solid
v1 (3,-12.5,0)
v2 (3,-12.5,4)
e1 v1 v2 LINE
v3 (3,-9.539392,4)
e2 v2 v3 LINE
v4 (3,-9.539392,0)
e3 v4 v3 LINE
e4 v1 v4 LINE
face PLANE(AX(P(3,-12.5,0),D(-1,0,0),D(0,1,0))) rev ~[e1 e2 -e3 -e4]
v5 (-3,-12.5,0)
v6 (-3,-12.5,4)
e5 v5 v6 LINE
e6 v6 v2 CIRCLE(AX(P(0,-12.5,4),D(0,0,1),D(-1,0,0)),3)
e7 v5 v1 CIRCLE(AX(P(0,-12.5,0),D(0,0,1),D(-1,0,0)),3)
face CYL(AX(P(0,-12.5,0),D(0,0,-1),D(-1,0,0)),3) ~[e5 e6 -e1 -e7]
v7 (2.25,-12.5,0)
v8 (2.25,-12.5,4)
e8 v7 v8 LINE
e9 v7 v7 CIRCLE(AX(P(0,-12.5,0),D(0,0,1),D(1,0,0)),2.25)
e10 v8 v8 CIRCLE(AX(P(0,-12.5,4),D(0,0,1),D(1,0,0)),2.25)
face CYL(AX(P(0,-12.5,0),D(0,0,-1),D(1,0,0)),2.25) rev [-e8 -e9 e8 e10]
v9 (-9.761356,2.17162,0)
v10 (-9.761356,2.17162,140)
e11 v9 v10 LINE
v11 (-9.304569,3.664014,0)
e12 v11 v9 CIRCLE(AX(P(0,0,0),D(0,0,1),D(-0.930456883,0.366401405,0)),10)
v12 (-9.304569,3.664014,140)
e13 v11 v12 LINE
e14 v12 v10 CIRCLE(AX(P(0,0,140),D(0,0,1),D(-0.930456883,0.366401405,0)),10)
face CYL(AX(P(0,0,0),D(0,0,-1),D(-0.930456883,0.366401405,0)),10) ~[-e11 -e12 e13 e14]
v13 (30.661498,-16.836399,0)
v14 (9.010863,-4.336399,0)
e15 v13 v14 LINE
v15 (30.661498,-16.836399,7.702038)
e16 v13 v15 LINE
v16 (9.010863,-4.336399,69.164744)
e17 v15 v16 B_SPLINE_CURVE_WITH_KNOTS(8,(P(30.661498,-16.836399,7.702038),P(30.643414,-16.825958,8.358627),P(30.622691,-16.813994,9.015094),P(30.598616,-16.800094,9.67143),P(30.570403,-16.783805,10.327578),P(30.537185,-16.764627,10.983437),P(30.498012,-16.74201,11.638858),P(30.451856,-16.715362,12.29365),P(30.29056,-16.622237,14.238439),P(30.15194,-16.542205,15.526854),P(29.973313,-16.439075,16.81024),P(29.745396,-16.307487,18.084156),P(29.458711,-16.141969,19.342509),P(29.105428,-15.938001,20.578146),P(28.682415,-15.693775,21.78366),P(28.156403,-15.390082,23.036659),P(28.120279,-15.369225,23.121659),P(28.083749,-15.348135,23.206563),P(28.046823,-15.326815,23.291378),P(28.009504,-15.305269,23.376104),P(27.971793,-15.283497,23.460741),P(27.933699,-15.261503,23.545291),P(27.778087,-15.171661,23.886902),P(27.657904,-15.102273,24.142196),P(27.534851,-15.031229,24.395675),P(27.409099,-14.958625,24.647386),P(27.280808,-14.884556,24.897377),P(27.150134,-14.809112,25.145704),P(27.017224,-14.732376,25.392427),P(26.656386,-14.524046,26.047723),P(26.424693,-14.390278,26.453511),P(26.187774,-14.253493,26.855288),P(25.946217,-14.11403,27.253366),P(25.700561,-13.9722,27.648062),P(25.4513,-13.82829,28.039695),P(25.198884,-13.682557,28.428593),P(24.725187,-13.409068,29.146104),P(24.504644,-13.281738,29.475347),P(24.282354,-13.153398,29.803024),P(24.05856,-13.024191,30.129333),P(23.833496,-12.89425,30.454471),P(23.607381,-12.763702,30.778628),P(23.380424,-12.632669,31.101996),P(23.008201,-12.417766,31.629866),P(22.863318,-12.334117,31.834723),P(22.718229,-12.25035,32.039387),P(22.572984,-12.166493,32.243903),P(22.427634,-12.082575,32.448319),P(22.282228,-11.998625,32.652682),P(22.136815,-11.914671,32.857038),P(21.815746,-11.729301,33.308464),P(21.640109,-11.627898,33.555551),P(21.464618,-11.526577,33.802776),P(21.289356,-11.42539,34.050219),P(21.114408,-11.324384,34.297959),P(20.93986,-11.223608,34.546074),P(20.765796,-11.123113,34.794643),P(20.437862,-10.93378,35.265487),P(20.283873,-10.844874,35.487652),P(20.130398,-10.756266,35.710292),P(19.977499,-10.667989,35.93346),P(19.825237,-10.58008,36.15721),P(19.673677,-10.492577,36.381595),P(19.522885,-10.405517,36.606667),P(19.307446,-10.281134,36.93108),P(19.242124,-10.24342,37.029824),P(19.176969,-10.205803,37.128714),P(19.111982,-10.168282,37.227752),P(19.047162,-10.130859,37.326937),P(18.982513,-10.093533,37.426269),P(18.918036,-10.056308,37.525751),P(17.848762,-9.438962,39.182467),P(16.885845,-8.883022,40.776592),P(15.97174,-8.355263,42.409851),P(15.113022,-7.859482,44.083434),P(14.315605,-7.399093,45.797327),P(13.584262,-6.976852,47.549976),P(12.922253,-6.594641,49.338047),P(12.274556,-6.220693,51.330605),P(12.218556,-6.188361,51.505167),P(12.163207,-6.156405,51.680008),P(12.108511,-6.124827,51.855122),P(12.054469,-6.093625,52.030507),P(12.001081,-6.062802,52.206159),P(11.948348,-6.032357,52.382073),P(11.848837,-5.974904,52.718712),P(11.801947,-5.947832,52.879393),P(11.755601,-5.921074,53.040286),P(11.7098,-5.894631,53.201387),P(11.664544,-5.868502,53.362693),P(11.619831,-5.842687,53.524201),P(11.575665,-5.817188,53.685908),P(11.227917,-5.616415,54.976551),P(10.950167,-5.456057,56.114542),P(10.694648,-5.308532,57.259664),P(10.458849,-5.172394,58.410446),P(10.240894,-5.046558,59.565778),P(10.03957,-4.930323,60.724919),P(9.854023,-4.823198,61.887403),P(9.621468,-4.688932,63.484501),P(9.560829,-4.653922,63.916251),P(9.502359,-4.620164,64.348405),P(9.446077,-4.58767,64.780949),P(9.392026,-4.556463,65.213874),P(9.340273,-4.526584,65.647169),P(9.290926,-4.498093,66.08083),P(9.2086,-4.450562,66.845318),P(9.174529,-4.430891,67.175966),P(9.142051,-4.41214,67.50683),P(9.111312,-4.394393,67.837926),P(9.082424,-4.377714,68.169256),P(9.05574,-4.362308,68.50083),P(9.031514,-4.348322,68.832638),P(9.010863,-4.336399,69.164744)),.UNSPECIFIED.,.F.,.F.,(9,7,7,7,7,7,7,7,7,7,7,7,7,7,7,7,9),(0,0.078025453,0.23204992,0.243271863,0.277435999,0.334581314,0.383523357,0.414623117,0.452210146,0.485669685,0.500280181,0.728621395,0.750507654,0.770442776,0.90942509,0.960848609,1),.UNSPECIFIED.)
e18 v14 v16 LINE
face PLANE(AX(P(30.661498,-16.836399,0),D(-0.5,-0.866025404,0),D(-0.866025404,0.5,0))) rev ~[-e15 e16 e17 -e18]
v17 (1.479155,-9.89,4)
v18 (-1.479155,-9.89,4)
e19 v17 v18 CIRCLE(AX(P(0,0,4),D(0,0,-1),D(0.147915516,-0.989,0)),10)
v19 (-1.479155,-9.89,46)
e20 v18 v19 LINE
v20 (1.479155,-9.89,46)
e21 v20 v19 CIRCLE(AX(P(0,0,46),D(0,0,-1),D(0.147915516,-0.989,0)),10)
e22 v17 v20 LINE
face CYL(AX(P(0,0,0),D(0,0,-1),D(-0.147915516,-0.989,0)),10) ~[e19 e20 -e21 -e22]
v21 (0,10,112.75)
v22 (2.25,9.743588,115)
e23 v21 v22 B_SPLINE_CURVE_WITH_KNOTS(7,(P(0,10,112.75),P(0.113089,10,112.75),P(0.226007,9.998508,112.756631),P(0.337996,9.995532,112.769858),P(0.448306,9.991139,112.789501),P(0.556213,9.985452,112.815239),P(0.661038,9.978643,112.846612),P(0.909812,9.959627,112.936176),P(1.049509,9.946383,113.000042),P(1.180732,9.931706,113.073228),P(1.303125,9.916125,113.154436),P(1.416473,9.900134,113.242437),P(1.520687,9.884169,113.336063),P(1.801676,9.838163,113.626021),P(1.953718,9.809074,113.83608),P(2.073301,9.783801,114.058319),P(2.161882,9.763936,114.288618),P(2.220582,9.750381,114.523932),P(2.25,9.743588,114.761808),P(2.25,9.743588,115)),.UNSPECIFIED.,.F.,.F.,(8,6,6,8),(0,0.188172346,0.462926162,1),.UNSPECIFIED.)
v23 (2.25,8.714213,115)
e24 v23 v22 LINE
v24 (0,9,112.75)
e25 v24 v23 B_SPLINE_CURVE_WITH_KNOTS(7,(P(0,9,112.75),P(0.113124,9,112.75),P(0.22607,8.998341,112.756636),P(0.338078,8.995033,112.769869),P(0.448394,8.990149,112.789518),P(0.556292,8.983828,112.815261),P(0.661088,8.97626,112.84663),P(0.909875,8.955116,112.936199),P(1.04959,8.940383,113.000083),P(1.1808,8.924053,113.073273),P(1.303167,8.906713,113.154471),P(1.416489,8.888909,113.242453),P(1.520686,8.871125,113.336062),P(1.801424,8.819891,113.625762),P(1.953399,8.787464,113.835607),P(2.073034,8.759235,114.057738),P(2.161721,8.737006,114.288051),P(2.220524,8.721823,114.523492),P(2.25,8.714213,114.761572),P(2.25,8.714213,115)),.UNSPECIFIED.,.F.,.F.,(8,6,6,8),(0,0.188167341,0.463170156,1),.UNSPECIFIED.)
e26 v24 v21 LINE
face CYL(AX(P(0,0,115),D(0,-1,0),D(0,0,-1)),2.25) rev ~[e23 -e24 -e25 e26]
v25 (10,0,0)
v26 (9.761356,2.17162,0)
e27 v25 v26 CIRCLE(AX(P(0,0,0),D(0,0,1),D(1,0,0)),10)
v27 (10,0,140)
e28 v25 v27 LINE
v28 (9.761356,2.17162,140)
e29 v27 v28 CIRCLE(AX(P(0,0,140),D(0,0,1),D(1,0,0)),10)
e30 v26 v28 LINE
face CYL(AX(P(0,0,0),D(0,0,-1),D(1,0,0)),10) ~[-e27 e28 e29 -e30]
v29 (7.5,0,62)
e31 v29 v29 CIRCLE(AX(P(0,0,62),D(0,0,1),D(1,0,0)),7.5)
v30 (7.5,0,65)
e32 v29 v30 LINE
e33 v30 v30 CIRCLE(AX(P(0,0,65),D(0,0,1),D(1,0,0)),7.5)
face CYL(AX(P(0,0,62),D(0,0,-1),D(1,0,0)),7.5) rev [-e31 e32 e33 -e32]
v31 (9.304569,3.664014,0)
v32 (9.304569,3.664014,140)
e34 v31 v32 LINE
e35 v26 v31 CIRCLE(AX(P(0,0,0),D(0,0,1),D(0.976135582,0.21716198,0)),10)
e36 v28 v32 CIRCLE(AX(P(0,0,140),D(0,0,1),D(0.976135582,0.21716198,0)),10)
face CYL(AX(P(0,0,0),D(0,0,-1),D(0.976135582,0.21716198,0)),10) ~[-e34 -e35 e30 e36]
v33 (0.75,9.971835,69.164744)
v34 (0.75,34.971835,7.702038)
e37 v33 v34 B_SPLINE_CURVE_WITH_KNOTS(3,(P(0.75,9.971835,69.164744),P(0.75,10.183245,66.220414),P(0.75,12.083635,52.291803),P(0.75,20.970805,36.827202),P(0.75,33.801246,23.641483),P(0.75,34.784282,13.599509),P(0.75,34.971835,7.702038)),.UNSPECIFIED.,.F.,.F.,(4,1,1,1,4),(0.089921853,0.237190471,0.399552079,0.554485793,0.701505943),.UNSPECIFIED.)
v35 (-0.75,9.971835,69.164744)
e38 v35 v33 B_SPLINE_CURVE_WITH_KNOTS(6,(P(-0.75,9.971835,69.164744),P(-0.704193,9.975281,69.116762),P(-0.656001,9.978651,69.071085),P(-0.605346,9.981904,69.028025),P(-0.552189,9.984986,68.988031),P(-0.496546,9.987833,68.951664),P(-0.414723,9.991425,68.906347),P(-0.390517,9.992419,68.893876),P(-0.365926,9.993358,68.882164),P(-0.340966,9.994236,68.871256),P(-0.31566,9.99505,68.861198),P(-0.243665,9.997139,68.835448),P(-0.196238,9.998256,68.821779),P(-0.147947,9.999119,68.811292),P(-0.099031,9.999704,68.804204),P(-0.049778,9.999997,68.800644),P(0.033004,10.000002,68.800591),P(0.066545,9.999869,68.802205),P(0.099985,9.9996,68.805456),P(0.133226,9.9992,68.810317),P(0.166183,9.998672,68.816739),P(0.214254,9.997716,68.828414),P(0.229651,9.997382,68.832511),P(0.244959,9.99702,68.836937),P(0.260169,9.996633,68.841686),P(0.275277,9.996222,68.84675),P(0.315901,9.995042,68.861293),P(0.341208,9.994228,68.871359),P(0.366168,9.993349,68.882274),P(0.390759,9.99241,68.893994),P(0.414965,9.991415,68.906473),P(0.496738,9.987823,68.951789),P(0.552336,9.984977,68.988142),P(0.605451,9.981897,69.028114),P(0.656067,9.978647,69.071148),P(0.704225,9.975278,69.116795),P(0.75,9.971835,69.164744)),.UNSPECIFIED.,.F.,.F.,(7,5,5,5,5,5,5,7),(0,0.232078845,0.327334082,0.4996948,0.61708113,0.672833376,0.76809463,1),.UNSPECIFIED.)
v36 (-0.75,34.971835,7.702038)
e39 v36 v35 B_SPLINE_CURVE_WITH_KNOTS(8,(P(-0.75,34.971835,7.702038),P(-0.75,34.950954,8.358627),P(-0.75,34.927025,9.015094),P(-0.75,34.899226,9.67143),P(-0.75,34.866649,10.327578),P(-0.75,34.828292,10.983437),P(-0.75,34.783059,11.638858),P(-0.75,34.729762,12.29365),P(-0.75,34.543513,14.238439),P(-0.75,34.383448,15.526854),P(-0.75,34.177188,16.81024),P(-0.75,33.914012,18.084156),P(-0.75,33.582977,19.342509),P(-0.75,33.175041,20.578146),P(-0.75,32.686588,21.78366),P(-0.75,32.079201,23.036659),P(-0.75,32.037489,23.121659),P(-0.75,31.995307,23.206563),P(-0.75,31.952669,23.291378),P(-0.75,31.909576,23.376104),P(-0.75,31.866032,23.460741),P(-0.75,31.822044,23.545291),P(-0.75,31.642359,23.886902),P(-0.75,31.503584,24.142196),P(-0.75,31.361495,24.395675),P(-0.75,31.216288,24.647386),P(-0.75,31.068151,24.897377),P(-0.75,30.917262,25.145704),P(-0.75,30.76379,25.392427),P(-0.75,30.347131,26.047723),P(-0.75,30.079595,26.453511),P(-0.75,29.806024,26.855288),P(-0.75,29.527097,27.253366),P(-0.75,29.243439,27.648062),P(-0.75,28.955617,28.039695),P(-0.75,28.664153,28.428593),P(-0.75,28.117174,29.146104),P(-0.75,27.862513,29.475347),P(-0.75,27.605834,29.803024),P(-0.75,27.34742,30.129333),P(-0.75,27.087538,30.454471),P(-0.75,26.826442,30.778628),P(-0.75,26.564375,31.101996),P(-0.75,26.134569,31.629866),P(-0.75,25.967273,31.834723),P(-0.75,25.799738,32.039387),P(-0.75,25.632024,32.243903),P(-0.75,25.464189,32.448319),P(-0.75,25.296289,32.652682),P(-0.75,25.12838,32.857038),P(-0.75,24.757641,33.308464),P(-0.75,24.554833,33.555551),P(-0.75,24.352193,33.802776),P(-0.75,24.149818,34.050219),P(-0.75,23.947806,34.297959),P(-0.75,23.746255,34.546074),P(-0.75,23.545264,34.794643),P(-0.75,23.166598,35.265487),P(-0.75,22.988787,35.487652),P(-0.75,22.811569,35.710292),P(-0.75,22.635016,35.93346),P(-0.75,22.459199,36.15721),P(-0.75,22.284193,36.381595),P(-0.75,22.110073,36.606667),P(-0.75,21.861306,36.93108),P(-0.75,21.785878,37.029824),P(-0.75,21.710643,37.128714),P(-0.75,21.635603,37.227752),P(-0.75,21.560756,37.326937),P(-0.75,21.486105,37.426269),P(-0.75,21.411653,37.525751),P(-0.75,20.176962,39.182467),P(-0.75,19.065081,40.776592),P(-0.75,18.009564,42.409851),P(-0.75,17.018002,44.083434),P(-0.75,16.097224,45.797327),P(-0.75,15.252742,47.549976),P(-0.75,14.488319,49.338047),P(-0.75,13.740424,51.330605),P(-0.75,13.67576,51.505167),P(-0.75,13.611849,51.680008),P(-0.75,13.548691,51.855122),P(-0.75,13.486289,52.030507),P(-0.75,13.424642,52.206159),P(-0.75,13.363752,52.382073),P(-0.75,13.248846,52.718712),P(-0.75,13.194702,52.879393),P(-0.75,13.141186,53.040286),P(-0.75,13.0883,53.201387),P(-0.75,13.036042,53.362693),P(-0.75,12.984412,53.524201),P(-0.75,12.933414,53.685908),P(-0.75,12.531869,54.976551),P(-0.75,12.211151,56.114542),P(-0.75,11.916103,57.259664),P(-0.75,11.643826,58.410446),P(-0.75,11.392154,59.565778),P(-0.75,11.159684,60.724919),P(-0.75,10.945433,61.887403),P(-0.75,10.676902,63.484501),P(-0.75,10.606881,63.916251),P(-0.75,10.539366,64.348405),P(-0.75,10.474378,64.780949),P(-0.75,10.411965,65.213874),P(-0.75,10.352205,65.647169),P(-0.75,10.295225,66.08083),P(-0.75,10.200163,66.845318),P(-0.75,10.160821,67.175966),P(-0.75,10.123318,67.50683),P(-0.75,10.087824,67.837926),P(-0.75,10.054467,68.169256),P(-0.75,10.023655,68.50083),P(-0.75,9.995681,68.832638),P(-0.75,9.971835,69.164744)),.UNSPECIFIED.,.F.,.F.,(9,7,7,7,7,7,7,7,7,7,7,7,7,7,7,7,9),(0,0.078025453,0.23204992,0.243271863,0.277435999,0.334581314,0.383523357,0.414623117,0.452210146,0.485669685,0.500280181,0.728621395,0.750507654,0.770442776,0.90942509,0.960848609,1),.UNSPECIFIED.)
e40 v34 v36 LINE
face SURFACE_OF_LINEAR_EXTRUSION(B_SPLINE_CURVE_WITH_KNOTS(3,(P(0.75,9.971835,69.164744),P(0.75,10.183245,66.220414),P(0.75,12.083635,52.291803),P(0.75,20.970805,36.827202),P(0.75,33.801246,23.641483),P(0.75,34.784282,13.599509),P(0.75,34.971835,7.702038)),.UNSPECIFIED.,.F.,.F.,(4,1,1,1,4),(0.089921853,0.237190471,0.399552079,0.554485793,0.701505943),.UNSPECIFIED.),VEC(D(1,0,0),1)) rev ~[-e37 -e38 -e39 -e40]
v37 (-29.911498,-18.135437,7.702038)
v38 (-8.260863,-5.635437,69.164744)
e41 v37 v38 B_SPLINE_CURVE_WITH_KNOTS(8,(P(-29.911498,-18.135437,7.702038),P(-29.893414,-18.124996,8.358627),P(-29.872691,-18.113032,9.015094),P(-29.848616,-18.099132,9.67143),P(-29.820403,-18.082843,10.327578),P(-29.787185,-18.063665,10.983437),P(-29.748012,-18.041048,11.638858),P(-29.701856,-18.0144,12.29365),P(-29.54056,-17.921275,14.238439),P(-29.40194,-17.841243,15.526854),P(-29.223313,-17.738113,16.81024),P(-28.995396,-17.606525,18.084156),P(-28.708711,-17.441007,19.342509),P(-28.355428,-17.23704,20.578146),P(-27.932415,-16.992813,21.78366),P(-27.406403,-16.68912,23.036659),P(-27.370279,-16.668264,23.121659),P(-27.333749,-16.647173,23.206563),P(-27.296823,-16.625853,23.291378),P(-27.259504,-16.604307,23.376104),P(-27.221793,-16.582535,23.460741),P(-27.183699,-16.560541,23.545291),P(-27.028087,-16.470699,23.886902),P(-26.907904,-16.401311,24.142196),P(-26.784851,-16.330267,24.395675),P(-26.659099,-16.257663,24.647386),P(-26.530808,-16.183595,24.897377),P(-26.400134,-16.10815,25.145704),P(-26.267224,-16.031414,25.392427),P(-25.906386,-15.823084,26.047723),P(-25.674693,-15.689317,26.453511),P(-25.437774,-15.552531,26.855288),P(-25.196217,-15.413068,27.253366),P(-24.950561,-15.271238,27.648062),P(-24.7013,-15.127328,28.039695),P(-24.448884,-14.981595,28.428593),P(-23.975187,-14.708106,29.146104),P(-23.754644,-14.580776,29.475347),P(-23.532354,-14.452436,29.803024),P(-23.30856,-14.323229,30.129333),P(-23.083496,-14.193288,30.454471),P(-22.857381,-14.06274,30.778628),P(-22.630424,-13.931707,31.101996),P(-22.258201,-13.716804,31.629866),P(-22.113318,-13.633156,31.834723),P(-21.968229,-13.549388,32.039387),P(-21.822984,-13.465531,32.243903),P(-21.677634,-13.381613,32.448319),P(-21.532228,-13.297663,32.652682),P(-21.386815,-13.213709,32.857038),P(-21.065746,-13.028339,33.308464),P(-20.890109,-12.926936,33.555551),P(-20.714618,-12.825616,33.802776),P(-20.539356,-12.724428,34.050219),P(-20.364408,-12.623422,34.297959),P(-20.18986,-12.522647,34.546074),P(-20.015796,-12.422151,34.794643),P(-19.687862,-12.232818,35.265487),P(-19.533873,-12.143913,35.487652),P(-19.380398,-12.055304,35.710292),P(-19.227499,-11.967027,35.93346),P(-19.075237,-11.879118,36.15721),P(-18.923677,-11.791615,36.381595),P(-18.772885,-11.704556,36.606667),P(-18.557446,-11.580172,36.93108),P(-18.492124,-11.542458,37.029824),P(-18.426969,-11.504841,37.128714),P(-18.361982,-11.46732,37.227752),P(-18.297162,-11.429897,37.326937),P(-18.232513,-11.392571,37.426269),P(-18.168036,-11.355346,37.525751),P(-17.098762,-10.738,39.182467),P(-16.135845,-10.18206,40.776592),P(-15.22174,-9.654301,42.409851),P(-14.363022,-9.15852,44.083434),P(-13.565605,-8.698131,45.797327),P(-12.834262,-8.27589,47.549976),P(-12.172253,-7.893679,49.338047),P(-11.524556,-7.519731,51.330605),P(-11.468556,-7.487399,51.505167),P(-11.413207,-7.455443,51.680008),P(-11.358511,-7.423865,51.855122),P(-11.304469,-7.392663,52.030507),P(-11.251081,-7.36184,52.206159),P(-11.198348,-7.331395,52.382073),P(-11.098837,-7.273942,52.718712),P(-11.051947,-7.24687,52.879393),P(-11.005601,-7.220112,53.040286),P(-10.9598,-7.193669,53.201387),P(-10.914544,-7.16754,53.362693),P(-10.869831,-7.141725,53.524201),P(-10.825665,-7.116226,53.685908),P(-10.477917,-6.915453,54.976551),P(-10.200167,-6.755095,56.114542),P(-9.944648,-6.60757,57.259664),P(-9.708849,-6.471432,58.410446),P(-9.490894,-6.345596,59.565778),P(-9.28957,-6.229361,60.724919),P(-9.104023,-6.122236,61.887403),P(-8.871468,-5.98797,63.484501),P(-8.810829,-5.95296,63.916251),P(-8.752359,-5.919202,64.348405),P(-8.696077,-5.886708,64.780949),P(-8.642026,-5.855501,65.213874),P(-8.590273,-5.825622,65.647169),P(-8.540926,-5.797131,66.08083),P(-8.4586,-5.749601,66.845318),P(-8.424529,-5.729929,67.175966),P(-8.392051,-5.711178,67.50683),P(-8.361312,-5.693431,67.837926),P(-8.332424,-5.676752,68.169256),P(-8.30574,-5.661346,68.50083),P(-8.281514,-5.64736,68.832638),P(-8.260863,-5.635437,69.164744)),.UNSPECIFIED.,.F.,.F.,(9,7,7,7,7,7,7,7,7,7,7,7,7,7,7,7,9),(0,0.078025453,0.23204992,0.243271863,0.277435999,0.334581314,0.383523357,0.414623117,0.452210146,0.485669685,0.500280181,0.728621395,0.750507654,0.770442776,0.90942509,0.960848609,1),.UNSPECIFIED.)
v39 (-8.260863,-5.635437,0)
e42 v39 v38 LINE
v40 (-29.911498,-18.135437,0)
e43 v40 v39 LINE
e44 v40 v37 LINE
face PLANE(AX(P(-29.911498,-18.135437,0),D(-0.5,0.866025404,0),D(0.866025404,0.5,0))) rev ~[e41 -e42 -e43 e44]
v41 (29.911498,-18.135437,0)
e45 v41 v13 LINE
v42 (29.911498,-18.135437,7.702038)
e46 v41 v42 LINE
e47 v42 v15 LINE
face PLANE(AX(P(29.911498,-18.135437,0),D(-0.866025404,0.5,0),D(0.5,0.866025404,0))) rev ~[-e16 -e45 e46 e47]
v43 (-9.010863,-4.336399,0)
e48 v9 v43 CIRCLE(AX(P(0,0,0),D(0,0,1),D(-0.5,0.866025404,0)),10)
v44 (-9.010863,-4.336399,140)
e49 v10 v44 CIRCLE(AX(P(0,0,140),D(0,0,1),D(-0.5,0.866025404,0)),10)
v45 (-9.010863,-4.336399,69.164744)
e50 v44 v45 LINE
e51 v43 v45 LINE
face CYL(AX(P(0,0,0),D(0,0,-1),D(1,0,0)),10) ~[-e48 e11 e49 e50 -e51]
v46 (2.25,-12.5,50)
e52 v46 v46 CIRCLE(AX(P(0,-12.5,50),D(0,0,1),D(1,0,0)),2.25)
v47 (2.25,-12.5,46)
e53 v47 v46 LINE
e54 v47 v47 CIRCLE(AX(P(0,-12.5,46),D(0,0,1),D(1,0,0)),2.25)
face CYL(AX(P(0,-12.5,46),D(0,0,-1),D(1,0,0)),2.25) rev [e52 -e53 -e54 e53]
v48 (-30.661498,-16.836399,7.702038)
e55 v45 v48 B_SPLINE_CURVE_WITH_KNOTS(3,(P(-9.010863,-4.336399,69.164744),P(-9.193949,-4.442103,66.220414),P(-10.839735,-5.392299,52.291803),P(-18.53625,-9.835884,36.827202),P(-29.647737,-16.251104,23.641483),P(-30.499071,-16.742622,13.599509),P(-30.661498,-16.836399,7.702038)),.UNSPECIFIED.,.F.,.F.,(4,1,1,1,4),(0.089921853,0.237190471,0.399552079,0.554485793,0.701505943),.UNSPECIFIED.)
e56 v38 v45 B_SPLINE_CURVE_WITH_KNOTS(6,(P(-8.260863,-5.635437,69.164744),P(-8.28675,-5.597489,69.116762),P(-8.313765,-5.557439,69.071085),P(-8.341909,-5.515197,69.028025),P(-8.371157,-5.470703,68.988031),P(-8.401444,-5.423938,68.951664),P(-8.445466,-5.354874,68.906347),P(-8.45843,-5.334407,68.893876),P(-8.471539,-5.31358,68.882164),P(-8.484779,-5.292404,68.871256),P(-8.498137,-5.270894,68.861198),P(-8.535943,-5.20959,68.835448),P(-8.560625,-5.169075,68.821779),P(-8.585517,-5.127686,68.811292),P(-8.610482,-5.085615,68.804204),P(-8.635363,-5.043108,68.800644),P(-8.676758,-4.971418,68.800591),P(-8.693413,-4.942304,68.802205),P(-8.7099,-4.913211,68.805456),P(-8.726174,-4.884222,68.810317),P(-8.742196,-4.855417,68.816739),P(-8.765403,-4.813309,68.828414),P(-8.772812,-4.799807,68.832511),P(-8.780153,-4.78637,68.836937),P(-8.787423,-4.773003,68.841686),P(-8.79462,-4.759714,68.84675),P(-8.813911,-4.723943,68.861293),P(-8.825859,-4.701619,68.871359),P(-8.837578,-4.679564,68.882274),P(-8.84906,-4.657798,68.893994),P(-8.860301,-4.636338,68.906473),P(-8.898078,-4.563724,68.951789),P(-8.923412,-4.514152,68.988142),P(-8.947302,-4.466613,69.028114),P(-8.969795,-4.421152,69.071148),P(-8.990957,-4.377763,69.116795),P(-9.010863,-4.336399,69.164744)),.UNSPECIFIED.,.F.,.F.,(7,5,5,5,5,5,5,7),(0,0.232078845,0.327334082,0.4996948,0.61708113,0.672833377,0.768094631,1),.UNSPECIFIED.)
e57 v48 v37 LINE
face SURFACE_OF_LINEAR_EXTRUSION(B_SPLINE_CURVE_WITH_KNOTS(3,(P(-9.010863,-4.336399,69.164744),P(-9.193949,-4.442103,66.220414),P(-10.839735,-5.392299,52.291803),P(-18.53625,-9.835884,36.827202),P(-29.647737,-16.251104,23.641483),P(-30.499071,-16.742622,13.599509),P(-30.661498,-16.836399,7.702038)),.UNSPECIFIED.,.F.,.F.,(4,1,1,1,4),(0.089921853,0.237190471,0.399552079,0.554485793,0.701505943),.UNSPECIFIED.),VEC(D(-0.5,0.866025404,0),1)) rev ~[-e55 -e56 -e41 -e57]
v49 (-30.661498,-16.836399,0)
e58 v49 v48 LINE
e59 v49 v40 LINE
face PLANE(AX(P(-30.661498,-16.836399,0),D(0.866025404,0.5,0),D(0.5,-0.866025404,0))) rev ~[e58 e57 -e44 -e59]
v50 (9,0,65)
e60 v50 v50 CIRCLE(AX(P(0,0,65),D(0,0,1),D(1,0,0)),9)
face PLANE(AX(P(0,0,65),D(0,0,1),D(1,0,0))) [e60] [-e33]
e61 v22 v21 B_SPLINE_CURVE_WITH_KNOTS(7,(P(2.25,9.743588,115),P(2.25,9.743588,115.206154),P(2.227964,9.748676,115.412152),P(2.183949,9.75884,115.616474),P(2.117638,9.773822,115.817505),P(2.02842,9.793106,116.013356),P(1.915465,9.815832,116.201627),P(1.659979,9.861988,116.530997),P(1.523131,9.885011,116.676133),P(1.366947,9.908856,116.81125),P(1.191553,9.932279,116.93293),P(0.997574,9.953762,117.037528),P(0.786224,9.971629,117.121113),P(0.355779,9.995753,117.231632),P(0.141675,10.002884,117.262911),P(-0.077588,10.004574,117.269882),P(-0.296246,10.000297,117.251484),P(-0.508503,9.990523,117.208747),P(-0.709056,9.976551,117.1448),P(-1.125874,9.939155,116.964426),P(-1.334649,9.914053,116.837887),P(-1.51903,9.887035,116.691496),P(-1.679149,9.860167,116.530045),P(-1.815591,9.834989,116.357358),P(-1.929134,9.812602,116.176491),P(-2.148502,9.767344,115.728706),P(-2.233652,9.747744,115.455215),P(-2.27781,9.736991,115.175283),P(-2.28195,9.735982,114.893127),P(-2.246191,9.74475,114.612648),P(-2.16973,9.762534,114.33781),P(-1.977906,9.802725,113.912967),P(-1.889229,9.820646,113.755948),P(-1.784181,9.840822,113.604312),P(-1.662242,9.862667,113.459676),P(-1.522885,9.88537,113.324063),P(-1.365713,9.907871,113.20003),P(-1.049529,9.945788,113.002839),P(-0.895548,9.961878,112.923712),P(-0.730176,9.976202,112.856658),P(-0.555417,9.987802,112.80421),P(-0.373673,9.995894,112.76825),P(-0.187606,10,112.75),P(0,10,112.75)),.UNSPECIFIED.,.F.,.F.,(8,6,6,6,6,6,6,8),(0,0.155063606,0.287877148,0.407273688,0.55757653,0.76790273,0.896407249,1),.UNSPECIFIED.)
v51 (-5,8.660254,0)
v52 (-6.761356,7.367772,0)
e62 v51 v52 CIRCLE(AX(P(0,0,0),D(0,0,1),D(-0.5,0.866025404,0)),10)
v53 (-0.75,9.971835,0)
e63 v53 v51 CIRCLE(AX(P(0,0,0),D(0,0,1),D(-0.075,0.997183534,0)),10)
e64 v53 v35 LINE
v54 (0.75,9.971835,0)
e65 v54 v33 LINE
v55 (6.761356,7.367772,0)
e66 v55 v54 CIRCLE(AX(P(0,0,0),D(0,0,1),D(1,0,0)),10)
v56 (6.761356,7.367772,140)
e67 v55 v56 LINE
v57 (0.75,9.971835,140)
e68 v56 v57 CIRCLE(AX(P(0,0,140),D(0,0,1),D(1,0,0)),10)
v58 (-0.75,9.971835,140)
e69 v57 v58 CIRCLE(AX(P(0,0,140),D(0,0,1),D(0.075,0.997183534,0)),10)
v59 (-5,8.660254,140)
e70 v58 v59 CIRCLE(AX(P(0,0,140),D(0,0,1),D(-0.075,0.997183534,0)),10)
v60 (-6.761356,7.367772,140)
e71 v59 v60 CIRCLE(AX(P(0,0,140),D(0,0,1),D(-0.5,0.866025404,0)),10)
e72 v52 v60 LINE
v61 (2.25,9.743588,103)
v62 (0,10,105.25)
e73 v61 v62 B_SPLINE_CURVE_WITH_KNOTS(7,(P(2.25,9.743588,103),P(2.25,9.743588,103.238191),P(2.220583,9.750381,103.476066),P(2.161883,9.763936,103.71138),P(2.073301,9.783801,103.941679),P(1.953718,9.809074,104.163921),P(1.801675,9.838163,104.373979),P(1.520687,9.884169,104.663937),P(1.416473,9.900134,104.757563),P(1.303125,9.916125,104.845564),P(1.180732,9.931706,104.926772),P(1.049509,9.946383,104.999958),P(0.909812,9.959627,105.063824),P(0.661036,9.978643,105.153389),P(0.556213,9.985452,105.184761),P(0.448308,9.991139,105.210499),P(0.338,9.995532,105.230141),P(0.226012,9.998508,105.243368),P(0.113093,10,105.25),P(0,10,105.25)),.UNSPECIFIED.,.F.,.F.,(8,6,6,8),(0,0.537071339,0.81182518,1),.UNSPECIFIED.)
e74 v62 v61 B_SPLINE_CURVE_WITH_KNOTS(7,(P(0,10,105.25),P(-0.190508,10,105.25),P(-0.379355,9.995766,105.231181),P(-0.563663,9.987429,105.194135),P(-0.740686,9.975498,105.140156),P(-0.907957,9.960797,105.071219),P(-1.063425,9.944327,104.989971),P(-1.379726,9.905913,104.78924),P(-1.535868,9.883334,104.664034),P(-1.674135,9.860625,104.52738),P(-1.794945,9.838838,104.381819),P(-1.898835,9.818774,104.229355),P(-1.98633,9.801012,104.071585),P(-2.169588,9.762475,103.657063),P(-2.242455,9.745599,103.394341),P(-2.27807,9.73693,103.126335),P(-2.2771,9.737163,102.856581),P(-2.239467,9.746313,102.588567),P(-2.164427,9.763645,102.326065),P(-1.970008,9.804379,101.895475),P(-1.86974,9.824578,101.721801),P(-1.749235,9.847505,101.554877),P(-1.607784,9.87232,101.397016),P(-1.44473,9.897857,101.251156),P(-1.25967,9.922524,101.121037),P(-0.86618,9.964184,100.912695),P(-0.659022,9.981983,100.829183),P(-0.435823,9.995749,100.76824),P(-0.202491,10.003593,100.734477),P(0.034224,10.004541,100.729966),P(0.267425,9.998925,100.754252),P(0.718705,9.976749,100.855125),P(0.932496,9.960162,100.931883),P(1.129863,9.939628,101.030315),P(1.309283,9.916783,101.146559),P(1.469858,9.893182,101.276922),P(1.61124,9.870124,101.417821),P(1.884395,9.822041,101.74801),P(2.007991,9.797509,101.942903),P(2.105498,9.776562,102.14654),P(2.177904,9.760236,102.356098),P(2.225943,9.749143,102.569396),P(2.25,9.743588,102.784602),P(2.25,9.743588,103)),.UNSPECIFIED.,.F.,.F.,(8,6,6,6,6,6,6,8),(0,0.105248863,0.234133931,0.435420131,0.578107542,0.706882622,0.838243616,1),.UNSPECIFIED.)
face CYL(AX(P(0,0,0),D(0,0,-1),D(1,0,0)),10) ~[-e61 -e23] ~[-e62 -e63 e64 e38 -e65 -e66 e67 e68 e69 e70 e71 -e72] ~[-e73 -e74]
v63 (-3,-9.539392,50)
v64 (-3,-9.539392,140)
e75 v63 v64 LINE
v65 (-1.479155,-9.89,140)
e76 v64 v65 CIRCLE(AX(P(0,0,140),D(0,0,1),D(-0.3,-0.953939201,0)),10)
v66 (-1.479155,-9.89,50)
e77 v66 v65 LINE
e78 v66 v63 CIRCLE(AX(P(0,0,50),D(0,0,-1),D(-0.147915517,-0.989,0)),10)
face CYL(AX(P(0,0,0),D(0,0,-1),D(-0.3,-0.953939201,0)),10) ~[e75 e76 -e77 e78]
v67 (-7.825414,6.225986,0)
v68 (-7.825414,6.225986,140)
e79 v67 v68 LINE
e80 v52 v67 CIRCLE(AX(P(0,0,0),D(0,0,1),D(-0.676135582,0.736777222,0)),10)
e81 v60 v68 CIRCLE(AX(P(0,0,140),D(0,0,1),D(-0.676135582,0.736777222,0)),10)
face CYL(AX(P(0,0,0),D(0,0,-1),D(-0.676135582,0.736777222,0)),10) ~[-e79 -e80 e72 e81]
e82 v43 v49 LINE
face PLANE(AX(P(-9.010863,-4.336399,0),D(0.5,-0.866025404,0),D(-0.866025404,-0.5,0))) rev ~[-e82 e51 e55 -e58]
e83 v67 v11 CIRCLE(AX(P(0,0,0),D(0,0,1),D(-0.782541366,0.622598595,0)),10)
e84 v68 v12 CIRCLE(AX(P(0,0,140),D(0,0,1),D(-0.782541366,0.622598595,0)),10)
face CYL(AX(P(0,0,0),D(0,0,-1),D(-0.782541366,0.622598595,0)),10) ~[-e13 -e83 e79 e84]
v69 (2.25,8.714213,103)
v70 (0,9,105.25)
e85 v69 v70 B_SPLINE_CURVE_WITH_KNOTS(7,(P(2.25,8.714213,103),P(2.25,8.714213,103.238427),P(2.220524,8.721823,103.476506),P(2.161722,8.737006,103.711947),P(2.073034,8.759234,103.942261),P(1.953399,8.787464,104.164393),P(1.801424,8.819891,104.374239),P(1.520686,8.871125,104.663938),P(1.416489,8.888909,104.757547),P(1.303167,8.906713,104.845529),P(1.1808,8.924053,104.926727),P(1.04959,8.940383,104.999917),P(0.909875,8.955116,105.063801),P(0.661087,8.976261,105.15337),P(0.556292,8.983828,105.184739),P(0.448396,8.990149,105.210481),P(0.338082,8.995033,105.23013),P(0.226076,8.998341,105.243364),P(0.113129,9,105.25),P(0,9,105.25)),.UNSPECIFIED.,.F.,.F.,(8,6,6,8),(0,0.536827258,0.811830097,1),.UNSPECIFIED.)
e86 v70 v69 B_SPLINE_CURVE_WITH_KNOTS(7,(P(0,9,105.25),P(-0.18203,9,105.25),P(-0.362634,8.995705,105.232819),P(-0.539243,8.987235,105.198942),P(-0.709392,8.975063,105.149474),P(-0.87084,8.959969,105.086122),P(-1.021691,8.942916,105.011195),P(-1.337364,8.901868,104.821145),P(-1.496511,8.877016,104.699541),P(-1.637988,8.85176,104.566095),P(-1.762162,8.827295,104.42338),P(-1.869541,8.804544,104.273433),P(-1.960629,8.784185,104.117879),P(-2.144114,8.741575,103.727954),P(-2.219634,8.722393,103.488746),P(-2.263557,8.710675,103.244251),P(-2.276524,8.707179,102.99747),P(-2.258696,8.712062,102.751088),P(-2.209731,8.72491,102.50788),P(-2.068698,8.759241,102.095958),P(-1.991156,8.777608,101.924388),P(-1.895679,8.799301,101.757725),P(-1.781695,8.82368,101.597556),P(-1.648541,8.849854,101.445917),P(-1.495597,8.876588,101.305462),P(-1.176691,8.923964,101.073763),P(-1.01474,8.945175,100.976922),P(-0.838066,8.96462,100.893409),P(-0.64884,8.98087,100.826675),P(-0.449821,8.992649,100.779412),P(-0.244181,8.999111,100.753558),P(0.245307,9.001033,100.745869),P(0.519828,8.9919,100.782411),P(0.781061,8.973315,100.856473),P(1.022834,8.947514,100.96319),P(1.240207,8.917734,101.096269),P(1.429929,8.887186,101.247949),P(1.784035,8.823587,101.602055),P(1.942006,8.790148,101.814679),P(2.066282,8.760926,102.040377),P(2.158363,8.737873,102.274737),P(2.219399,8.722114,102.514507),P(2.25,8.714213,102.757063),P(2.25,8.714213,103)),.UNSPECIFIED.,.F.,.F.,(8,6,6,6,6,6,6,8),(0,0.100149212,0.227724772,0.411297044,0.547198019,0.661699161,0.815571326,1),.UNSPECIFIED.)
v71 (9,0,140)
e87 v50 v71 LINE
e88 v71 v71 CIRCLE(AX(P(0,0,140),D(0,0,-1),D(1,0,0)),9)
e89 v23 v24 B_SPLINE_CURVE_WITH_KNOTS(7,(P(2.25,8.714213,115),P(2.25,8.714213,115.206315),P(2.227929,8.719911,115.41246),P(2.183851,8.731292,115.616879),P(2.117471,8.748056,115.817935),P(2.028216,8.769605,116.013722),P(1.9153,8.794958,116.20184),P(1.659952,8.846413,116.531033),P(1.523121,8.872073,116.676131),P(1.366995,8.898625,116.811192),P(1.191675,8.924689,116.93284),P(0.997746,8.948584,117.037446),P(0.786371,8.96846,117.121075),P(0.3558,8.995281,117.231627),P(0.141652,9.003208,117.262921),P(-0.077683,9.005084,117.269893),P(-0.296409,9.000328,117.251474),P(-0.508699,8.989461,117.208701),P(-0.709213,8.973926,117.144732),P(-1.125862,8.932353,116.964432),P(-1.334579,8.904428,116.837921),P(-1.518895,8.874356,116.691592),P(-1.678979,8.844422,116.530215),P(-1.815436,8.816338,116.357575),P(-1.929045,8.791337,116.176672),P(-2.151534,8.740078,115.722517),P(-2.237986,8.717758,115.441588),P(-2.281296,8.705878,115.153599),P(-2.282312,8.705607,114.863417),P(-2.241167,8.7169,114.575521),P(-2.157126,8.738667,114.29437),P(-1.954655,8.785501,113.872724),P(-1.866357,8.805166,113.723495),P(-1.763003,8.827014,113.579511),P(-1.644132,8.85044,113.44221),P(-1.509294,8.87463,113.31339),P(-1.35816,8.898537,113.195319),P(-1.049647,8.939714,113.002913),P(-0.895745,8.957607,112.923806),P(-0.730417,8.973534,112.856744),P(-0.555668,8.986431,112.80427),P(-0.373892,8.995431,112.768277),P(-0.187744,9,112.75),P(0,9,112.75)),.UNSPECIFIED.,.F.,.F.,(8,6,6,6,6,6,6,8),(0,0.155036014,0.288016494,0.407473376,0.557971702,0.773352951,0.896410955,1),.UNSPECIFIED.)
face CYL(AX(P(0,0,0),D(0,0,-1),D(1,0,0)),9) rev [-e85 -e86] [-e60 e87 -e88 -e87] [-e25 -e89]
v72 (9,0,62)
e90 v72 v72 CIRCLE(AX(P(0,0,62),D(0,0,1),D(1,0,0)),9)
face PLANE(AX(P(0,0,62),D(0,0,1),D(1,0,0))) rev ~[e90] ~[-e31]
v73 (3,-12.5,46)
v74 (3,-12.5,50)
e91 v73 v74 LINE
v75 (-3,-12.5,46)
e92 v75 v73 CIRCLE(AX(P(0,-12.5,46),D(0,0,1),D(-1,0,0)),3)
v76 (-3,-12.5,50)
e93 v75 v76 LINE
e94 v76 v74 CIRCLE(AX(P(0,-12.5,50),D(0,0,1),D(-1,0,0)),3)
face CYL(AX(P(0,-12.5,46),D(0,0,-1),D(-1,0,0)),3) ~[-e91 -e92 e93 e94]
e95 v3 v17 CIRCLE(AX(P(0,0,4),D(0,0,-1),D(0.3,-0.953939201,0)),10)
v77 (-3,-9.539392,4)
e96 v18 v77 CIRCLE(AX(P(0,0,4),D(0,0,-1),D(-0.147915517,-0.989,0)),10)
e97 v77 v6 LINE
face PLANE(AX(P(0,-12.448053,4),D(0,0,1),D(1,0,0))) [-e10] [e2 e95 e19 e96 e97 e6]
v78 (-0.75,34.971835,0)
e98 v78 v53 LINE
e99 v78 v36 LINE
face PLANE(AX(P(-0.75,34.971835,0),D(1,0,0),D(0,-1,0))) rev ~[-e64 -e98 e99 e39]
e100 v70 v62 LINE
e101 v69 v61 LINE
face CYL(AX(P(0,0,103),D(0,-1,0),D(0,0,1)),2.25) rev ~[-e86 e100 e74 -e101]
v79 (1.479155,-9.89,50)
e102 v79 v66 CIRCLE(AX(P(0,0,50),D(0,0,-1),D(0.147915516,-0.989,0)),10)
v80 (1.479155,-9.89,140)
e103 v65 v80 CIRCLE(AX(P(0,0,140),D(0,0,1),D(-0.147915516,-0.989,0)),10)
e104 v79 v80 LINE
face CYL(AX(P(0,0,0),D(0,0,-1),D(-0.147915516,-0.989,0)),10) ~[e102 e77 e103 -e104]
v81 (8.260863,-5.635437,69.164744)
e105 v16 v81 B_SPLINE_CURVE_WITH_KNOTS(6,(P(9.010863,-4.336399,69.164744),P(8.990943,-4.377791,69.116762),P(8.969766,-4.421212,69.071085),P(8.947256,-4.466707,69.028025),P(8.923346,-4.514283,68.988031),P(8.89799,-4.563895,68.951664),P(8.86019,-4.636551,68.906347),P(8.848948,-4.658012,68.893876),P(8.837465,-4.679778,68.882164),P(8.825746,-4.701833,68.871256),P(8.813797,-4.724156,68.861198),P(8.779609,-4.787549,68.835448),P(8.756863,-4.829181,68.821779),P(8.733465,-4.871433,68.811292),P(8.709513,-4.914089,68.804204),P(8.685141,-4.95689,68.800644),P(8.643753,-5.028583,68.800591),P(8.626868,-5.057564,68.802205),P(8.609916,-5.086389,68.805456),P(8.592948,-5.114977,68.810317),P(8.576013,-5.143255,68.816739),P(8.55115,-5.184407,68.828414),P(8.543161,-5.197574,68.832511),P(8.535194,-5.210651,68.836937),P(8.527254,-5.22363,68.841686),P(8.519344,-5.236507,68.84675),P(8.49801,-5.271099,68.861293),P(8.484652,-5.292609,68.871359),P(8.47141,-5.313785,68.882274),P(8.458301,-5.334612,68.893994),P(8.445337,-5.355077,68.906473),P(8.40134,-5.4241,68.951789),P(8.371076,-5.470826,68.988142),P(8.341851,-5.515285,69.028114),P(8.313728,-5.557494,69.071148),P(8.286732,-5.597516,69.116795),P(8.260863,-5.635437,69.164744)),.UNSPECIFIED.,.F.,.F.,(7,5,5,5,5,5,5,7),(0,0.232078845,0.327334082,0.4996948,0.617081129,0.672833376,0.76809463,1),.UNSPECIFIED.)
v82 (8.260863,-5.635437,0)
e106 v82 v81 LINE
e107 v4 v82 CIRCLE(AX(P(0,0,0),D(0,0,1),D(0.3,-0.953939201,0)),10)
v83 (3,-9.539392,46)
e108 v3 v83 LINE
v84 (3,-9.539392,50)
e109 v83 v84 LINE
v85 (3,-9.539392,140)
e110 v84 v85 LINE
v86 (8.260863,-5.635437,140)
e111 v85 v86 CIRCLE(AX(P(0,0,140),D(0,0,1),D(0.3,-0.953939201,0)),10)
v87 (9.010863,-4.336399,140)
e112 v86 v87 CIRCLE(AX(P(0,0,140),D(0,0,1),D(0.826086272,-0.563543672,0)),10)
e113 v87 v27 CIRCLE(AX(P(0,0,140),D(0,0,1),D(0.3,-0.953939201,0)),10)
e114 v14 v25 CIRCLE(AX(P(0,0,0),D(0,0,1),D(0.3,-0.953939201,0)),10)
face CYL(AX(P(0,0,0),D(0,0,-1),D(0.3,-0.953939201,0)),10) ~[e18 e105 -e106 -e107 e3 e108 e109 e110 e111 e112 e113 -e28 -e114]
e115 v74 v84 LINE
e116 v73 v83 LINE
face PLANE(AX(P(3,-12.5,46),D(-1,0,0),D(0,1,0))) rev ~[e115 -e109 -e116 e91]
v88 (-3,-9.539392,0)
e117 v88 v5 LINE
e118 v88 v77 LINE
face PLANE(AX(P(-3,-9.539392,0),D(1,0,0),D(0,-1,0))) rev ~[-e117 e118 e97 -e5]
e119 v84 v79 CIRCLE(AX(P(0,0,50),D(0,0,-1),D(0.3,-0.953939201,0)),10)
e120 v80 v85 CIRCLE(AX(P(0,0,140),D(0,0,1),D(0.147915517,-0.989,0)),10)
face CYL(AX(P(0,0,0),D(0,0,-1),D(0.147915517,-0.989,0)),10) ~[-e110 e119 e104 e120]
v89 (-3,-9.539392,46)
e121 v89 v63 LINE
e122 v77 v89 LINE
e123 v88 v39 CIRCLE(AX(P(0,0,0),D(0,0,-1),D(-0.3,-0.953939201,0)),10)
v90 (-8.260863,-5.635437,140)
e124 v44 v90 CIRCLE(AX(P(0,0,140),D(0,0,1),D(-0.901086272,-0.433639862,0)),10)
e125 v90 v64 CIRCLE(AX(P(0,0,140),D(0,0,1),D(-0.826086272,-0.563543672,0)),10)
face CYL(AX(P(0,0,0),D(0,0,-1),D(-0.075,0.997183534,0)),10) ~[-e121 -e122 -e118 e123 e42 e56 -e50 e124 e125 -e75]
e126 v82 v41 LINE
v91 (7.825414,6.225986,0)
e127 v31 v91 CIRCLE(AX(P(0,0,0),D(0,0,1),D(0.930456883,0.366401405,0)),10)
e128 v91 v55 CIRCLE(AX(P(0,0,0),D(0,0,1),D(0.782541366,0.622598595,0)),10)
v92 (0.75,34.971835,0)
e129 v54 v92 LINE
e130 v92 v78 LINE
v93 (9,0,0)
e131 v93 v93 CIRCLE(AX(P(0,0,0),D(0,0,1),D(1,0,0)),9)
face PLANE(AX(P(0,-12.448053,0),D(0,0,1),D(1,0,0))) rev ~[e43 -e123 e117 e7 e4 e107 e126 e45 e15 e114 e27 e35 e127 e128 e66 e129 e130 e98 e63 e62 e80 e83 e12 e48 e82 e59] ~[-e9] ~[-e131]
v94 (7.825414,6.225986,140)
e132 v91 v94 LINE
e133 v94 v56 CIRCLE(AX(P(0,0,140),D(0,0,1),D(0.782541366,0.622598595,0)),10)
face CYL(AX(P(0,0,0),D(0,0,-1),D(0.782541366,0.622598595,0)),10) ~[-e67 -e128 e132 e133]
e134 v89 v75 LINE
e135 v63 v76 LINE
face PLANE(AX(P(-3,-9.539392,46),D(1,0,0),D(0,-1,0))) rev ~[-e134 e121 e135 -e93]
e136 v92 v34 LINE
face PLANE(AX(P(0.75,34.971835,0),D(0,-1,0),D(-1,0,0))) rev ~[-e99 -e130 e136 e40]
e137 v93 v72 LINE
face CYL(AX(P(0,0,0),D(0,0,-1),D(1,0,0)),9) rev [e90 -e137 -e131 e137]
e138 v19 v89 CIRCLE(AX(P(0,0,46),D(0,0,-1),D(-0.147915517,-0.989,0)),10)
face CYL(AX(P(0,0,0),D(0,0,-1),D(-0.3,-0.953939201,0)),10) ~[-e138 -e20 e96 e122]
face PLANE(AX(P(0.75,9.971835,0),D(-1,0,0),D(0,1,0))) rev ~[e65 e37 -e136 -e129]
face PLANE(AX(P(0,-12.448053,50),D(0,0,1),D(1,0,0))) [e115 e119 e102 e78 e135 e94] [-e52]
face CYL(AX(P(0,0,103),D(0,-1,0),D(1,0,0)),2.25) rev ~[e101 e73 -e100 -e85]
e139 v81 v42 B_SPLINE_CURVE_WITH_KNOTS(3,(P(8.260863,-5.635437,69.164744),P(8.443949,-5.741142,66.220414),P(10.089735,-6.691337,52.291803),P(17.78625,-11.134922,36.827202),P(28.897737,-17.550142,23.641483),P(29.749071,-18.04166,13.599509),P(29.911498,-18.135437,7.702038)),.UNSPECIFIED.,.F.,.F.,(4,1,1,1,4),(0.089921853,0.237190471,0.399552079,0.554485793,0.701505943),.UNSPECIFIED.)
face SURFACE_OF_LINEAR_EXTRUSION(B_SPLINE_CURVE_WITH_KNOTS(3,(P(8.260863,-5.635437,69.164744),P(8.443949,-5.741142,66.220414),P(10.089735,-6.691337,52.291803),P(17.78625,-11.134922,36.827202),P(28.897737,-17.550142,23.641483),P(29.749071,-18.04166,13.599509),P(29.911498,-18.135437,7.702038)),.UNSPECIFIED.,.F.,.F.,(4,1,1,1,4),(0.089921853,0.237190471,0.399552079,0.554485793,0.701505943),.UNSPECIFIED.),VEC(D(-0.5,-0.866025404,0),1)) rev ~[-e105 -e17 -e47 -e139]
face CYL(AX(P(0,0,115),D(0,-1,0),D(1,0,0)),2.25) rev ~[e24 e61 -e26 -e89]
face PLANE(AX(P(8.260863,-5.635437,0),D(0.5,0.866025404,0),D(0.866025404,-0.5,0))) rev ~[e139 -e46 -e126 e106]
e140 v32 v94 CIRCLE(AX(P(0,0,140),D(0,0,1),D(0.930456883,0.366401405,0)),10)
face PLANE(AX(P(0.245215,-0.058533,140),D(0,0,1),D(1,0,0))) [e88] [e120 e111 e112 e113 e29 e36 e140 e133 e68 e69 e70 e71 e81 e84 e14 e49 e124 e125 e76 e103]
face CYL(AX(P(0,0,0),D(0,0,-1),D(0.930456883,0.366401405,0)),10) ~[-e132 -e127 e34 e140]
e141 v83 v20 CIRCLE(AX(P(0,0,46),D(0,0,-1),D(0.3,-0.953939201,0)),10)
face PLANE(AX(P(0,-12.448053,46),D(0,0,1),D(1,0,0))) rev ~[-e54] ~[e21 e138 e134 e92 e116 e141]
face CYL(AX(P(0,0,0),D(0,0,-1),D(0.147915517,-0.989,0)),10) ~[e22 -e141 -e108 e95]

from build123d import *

# Parameters (mm, degrees)
F0_R      = 9
F1_DEPTH  = 140
F2_DEPTH  = 100
F4_DEPTH  = 10.751
F5_COUNT  = 3
F0_R_2    = 2.25
F6_DEPTH  = 4
F7_START  = 46
F7_DEPTH  = 4
F8_START  = 62
F0_R_3    = 7.5
F8_DEPTH  = 3
F10_DEPTH = 25


# Not quite as in the source:
# - a feature names something its author has since deleted; it is built from what else it names


with BuildPart() as f1:
    # F0 (on Top) → F1 (new body)
    with BuildSketch(Plane.XY):
        with BuildLine():
            ThreePointArc((-3, -9.5393920142), (-2.2464281062, -9.744411771), (-1.4791551643, -9.89))
            ThreePointArc((-1.4791551643, -9.89), (0, -10), (1.4791551643, -9.89))
            ThreePointArc((1.4791551643, -9.89), (2.2464281062, -9.744411771), (3, -9.5393920142))
            ThreePointArc((3, -9.5393920142), (8.0622577483, -5.9160797831), (10, 0))
            ThreePointArc((10, 0), (7.3314391493, 6.8007352544), (0.75, 9.9718353376))
            ThreePointArc((0.75, 9.9718353376), (0, 10), (-0.75, 9.9718353376))
            ThreePointArc((-0.75, 9.9718353376), (-9.9341644436, 1.1455901566), (-3, -9.5393920142))
        make_face()
        Circle(F0_R, mode=Mode.SUBTRACT)
    extrude(amount=F1_DEPTH)

    # F0 (on Top) → F2 (join)
    with BuildSketch(Plane.XY):
        with BuildLine():
            Line((-0.75, 34.9718353376), (-0.75, 9.9718353376))
            ThreePointArc((-0.75, 9.9718353376), (0, 10), (0.75, 9.9718353376))
            Line((0.75, 9.9718353376), (0.75, 34.9718353376))
            Line((0.75, 34.9718353376), (-0.75, 34.9718353376))
        make_face()
    extrude(amount=F2_DEPTH)

    # F3 (on face) → F4 (cut, through all)
    with BuildSketch(Plane.YZ.offset(0.75)):
        with BuildLine():
            Line((9.9718353376, 100), (9.9718353376, 75))
            Line((9.9718353376, 75), (9.9718353376, 69.1647440576))
            add(Edge.make_bspline(
                [(9.9718353376, 69.1647440576), (10.1832449594, 66.2204140215), (12.0836351221, 52.2918027042), (20.9708053433, 36.8272021249), (33.801245613, 23.6414831262), (34.7842815391, 13.599508776), (34.9718353376, 7.702038365)],
                knots=[0.0899218527, 0.0899218527, 0.0899218527, 0.0899218527, 0.2371904705, 0.3995520788, 0.5544857931, 0.7015059428, 0.7015059428, 0.7015059428, 0.7015059428], degree=3))
            Line((34.9718353376, 7.702038365), (34.9718353376, 100))
            Line((34.9718353376, 100), (9.9718353376, 100))
        make_face()
    extrude(amount=-F4_DEPTH, mode=Mode.SUBTRACT)


with BuildPart() as f5_1:
    # F5: instance of F1
    add(f1.part.rotate(Axis((0, 0, 0), (0, 0, 1)), 1 * 360 / F5_COUNT))


with BuildPart() as f5_2:
    # F5: instance of F1
    add(f1.part.rotate(Axis((0, 0, 0), (0, 0, 1)), 2 * 360 / F5_COUNT))


with BuildPart() as f1_1:
    add(f1.part)

    add(f5_1.part)  # F6 merges F5_1

    add(f5_2.part)  # F6 merges F5_2
    # F0 (on Top) → F6 (join)
    with BuildSketch(Plane.XY):
        with BuildLine():
            ThreePointArc((1.4791551643, -9.89), (0, -10), (-1.4791551643, -9.89))
            ThreePointArc((-1.4791551643, -9.89), (-2.592051841, -10.9896135416), (-3, -12.5))
            ThreePointArc((-3, -12.5), (0, -15.5), (3, -12.5))
            ThreePointArc((3, -12.5), (2.592051841, -10.9896135416), (1.4791551643, -9.89))
        make_face()
        with Locations((0, -12.5)):
            Circle(F0_R_2, mode=Mode.SUBTRACT)
        with BuildLine():
            ThreePointArc((-3, -12.5), (-2.592051841, -10.9896135416), (-1.4791551643, -9.89))
            ThreePointArc((-1.4791551643, -9.89), (-2.2464281062, -9.744411771), (-3, -9.5393920142))
            Line((-3, -9.5393920142), (-3, -12.5))
        make_face()
        with BuildLine():
            ThreePointArc((3, -9.5393920142), (2.2464281062, -9.744411771), (1.4791551643, -9.89))
            ThreePointArc((1.4791551643, -9.89), (2.592051841, -10.9896135416), (3, -12.5))
            Line((3, -12.5), (3, -9.5393920142))
        make_face()
    extrude(amount=F6_DEPTH)

    # F0 (on Top) → F7 (join)
    with BuildSketch(Plane.XY.offset(F7_START)):
        with BuildLine():
            ThreePointArc((1.4791551643, -9.89), (0, -10), (-1.4791551643, -9.89))
            ThreePointArc((-1.4791551643, -9.89), (-2.592051841, -10.9896135416), (-3, -12.5))
            ThreePointArc((-3, -12.5), (0, -15.5), (3, -12.5))
            ThreePointArc((3, -12.5), (2.592051841, -10.9896135416), (1.4791551643, -9.89))
        make_face()
        with Locations((0, -12.5)):
            Circle(F0_R_2, mode=Mode.SUBTRACT)
        with BuildLine():
            ThreePointArc((-3, -12.5), (-2.592051841, -10.9896135416), (-1.4791551643, -9.89))
            ThreePointArc((-1.4791551643, -9.89), (-2.2464281062, -9.744411771), (-3, -9.5393920142))
            Line((-3, -9.5393920142), (-3, -12.5))
        make_face()
        with BuildLine():
            ThreePointArc((3, -9.5393920142), (2.2464281062, -9.744411771), (1.4791551643, -9.89))
            ThreePointArc((1.4791551643, -9.89), (2.592051841, -10.9896135416), (3, -12.5))
            Line((3, -12.5), (3, -9.5393920142))
        make_face()
    extrude(amount=F7_DEPTH)

    # F0 (on Top) → F8 (join)
    with BuildSketch(Plane.XY.offset(F8_START)):
        Circle(F0_R)
        Circle(F0_R_3, mode=Mode.SUBTRACT)
    extrude(amount=F8_DEPTH)

    # F9 (on Front) → F10 (cut)
    with BuildSketch(Plane.XZ):
        with BuildLine():
            ThreePointArc((2.25, 115), (-1.5909902577, 116.5909902577), (0, 112.75))
            ThreePointArc((0, 112.75), (1.5909902577, 113.4090097423), (2.25, 115))
        make_face()
        with BuildLine():
            ThreePointArc((2.25, 103), (1.5909902577, 104.5909902577), (0, 105.25))
            ThreePointArc((0, 105.25), (-1.5909902577, 101.4090097423), (2.25, 103))
        make_face()
    extrude(amount=-F10_DEPTH, mode=Mode.SUBTRACT)


solid = f1_1.part
